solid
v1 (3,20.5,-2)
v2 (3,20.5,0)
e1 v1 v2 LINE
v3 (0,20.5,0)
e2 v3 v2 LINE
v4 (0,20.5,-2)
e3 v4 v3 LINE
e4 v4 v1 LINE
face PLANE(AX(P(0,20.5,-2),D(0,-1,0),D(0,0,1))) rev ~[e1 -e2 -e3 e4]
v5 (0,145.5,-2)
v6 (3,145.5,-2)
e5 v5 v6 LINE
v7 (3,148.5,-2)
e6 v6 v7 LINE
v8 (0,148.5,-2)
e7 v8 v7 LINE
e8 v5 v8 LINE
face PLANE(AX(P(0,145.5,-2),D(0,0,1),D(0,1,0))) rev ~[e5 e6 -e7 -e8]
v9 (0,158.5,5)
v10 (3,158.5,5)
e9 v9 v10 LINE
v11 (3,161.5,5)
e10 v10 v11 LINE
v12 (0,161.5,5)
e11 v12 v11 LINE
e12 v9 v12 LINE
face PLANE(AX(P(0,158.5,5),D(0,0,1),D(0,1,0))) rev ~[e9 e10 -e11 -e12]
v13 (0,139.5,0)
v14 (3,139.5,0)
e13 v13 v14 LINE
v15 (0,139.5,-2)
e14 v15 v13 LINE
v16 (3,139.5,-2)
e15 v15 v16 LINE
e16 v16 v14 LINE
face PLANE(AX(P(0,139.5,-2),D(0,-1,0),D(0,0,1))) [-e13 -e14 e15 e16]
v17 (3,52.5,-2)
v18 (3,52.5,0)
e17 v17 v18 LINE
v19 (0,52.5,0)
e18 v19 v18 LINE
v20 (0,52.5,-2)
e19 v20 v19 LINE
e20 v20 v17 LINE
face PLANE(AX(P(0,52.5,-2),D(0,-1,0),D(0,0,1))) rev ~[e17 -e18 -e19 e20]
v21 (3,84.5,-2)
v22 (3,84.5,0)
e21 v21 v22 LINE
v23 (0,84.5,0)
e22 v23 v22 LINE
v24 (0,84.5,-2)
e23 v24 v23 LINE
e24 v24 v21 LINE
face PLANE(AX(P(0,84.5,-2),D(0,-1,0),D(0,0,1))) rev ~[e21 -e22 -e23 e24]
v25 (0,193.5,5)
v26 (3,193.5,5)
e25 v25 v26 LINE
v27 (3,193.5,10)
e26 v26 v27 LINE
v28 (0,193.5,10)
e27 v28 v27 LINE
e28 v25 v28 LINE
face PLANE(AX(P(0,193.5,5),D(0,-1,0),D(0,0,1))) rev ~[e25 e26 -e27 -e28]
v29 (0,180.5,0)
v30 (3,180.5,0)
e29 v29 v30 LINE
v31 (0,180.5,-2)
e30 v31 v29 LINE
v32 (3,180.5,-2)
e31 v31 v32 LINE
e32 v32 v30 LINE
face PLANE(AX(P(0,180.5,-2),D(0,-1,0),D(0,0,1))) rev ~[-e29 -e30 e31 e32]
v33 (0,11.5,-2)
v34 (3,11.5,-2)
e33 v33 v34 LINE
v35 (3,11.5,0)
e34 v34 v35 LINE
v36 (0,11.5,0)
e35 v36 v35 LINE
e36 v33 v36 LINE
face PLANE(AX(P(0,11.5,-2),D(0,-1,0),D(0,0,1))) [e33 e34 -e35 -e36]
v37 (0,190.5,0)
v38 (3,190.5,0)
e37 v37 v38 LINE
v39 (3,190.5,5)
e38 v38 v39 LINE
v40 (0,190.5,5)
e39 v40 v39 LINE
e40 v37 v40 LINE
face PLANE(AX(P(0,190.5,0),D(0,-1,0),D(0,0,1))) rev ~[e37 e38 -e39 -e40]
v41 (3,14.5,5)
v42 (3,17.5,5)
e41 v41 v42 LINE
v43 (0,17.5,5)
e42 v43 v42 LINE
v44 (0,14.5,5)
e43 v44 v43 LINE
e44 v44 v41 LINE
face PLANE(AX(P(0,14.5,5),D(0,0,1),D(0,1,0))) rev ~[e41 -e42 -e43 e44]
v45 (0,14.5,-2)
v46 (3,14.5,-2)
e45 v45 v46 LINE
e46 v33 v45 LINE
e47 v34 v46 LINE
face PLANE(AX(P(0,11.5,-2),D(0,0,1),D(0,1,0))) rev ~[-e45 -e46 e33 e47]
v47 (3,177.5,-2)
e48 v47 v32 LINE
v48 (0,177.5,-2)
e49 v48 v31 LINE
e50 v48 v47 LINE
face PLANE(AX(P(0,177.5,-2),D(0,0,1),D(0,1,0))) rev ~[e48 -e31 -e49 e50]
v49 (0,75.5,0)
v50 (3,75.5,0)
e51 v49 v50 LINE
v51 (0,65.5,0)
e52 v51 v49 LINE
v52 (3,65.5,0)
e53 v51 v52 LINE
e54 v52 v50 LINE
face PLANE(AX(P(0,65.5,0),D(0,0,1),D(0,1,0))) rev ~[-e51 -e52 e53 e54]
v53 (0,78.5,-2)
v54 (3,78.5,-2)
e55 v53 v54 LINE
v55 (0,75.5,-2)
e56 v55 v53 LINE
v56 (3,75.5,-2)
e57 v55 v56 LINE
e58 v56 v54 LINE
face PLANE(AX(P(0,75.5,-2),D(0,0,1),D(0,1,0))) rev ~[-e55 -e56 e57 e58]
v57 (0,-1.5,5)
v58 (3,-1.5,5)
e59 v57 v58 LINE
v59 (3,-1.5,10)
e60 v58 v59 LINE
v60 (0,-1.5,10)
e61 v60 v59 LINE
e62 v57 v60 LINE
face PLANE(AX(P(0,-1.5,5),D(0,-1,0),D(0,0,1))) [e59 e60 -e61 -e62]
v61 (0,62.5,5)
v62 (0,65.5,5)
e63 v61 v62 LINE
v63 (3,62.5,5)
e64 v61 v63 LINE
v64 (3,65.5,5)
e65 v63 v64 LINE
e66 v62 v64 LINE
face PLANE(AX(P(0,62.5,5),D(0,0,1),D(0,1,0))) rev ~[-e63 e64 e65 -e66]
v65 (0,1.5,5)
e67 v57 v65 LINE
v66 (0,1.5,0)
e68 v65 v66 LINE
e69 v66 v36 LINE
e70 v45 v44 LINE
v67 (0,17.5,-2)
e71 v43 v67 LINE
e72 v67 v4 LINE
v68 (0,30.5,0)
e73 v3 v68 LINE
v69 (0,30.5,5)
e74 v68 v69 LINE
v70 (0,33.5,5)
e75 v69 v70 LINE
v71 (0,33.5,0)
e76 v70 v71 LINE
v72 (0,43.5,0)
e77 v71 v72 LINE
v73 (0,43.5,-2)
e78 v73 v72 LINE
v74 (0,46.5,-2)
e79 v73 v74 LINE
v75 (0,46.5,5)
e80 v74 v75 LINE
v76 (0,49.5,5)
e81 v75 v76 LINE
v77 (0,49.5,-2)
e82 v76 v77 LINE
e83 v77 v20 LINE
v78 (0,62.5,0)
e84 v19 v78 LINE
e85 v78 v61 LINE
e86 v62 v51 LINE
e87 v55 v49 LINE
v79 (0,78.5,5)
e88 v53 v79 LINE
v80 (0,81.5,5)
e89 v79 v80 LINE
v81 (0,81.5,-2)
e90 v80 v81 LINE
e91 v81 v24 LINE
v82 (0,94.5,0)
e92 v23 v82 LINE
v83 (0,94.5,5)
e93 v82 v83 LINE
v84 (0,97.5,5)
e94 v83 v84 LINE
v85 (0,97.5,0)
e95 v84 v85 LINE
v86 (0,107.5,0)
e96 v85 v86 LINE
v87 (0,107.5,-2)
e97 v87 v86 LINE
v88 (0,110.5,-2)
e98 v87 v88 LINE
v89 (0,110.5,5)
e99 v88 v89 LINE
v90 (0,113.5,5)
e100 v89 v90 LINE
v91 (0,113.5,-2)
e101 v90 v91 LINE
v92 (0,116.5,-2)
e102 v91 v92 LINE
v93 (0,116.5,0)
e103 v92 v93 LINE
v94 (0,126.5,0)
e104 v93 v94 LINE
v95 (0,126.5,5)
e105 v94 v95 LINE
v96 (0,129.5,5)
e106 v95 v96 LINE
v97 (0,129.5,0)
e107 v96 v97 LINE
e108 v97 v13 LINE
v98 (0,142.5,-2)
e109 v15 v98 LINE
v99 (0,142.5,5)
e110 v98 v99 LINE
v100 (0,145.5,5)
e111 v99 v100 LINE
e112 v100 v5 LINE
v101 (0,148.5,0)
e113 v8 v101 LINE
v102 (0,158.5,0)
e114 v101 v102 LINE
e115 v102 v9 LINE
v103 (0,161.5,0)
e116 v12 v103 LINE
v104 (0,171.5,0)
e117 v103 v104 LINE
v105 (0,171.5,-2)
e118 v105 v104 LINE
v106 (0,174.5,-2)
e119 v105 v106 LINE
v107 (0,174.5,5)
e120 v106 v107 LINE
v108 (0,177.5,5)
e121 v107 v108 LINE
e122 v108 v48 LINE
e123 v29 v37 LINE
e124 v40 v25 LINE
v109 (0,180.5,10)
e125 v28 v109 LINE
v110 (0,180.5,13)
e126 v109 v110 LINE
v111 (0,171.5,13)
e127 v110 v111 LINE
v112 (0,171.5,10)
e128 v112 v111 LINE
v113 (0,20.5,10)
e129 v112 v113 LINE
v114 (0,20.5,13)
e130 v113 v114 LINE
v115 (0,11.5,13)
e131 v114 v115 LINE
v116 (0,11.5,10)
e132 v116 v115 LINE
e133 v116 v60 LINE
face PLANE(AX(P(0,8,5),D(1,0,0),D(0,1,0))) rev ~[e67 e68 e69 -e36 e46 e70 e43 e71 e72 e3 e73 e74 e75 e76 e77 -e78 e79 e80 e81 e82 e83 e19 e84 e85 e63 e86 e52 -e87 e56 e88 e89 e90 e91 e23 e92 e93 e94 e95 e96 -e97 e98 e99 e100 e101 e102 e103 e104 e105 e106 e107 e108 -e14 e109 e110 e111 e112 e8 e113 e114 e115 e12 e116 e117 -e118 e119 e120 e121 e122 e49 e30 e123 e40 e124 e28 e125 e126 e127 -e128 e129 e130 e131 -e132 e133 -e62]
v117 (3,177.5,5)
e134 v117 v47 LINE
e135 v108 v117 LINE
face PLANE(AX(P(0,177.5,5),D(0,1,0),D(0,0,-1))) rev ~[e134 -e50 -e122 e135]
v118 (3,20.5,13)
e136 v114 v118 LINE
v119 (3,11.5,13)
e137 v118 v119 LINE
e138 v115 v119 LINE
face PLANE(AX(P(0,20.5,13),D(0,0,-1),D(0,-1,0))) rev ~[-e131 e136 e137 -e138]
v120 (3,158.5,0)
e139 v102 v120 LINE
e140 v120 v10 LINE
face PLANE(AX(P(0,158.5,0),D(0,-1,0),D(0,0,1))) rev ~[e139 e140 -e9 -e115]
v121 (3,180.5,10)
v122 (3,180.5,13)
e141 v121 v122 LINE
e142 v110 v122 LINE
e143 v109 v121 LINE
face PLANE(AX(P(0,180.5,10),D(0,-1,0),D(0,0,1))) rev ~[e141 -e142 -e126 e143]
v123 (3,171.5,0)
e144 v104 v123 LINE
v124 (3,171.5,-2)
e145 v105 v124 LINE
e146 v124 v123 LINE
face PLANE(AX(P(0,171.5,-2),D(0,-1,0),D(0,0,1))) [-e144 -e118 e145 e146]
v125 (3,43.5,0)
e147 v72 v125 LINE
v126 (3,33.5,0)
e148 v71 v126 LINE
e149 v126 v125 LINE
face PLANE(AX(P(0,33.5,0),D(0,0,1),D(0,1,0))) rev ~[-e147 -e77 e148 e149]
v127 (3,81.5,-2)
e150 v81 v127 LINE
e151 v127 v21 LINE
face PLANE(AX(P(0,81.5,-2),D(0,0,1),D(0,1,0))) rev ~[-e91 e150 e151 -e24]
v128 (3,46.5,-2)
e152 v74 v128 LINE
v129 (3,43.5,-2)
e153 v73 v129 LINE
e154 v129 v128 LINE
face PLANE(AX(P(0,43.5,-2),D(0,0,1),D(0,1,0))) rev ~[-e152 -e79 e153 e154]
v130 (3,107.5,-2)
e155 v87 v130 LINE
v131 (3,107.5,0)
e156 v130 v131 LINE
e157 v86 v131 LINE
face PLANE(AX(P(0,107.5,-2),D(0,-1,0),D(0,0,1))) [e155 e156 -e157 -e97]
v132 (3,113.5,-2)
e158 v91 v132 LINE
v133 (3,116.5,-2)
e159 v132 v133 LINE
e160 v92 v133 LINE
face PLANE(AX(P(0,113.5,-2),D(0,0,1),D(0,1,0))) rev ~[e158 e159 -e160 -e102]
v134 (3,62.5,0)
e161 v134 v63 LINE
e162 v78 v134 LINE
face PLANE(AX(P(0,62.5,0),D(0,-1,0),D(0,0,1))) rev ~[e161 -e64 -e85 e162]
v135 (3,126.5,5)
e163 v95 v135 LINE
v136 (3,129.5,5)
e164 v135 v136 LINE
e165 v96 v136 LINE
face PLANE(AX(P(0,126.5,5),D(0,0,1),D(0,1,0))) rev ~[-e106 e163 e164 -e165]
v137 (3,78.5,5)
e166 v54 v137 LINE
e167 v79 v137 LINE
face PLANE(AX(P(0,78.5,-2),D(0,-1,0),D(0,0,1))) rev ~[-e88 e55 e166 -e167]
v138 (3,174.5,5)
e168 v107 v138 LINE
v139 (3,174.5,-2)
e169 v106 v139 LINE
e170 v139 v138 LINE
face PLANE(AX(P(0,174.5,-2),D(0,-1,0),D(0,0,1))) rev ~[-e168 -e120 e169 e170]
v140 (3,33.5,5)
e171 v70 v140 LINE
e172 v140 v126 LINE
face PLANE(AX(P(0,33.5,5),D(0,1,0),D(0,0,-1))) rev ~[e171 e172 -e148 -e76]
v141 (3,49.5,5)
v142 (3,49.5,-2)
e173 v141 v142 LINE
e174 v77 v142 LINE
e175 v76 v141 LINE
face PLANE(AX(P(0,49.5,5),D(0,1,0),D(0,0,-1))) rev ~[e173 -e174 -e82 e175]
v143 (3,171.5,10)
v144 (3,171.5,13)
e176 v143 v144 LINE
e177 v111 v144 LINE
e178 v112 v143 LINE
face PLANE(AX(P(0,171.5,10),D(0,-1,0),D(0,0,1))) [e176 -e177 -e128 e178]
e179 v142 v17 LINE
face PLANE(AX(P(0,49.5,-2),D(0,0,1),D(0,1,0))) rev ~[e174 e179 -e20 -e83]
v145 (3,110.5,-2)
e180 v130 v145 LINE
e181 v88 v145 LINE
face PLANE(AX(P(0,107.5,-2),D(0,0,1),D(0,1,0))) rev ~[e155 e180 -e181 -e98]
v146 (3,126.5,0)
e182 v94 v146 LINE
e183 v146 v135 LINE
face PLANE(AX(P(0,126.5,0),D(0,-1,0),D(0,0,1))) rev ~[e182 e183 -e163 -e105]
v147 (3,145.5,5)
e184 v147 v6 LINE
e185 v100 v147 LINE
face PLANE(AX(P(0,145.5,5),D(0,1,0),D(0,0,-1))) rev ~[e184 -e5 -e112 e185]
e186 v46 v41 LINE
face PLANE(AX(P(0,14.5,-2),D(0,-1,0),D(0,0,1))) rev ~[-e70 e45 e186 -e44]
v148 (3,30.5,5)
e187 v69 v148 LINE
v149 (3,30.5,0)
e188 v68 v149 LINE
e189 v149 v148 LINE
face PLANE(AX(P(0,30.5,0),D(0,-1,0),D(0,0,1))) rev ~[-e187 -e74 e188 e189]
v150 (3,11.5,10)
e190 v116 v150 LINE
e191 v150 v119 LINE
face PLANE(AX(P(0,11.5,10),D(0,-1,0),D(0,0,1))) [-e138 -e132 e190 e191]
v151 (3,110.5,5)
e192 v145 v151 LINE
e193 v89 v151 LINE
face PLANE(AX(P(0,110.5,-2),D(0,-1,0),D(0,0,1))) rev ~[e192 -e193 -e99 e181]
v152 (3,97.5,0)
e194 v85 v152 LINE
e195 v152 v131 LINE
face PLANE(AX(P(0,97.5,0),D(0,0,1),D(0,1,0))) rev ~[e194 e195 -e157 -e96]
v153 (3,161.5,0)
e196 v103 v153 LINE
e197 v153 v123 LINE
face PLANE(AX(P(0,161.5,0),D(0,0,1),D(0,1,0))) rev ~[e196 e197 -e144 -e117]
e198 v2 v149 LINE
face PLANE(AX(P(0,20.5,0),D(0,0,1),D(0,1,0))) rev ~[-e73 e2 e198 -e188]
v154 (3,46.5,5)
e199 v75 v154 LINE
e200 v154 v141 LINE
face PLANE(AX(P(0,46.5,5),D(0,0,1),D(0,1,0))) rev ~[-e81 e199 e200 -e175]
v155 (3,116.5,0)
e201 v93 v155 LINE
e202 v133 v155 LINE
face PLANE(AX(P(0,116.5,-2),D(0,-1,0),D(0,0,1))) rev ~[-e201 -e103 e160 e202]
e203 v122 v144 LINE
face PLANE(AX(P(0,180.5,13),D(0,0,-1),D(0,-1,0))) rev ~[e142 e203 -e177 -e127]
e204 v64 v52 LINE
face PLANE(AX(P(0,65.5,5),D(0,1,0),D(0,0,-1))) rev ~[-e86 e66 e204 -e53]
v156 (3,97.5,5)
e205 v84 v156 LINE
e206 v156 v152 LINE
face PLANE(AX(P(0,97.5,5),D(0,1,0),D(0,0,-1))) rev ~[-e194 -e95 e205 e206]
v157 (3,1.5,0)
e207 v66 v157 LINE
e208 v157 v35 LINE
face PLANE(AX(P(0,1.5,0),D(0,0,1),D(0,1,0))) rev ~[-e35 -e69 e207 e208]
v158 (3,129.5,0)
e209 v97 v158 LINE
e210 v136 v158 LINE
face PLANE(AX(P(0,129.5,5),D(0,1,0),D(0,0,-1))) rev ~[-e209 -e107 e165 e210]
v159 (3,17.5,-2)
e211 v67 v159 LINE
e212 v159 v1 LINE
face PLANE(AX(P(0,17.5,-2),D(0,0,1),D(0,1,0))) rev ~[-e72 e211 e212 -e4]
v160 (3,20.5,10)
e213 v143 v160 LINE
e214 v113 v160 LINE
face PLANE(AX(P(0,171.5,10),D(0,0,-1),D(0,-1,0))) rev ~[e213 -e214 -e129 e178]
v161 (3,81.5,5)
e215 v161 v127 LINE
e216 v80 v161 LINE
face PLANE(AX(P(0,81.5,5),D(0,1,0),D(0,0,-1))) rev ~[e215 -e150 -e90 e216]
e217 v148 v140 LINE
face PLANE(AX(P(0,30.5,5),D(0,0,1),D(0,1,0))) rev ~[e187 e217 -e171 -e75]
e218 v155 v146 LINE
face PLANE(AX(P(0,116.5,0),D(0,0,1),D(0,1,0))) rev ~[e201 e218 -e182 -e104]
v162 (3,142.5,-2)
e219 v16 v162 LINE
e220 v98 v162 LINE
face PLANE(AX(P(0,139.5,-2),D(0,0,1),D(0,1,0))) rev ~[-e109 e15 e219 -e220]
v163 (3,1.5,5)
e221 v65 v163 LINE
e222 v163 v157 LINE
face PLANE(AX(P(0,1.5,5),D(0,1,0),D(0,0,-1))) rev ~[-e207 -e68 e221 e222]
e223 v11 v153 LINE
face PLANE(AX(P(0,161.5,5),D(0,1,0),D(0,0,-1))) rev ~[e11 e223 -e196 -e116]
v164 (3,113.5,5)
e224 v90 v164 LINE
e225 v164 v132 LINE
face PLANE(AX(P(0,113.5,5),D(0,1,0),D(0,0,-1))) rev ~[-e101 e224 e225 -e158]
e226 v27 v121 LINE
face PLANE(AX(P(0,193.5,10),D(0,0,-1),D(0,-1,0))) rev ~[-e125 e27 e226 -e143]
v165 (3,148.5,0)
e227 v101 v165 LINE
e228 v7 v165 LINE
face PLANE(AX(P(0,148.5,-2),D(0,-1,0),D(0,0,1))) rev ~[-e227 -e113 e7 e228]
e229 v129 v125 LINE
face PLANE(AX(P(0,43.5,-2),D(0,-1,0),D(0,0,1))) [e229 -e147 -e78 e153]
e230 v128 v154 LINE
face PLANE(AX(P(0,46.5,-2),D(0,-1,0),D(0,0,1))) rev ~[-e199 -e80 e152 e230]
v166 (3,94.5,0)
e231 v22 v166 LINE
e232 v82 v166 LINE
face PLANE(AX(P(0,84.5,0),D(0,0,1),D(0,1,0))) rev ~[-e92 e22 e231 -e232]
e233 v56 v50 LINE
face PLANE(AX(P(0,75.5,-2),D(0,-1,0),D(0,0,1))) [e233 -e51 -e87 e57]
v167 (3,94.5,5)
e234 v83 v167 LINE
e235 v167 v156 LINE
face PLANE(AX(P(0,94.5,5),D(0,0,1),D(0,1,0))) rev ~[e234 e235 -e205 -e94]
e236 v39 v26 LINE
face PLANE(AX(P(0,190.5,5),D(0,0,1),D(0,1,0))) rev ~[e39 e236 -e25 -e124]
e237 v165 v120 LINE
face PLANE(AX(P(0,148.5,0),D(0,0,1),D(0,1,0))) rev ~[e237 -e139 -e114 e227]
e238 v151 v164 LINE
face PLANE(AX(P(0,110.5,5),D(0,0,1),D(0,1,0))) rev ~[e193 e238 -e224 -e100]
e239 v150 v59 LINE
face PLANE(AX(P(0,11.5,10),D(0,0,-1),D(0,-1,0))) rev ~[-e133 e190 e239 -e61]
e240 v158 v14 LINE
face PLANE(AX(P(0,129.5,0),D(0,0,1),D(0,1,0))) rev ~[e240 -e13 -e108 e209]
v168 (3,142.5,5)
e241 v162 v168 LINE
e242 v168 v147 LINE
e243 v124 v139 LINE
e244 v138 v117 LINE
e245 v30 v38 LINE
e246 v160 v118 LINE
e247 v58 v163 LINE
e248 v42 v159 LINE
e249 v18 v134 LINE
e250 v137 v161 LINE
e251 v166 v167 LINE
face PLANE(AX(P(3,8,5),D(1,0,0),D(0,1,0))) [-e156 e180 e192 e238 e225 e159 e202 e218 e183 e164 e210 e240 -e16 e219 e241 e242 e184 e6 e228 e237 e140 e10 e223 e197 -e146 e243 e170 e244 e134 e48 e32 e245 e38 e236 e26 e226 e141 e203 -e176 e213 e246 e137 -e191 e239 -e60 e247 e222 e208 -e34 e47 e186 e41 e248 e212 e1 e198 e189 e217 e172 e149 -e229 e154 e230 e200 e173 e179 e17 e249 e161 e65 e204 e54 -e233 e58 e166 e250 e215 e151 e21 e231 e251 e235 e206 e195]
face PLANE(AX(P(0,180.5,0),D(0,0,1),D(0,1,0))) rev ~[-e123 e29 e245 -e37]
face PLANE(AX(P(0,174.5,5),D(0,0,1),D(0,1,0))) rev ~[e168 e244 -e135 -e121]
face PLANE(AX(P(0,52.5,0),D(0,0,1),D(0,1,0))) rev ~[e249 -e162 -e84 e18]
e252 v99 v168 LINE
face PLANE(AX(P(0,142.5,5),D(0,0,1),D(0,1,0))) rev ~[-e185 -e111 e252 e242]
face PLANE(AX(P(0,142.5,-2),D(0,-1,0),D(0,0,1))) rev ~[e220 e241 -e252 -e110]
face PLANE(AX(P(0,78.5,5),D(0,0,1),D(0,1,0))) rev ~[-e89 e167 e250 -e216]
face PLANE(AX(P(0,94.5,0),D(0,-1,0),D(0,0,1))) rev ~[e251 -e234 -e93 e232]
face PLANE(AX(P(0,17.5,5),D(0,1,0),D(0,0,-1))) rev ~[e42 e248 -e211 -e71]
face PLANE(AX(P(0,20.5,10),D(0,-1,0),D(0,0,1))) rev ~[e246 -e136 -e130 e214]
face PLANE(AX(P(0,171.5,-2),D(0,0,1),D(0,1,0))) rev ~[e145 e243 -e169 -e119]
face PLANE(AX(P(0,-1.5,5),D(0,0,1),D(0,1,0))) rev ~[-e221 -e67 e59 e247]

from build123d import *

# Parameters (mm, degrees)
F0_W     = 1.5
F0_H     = 5
F0_W_2   = 3
F0_H_2   = 2
F0_H_3   = 3
F1_DEPTH = 3


# Not quite as in the source:
# - a feature names something its author has since deleted; it is built from what else it names


with BuildPart() as f1:
    # F0 (on Right) → F1 (new body)
    with BuildSketch(Plane.YZ):
        Polygon((1.5, 5), (1.5, 0), (11.5, 0), (14.5, 0), (14.5, 5), (14.5, 10), (11.5, 10), (1.5, 10), align=None)
        with Locations((-0.75, 7.5)):
            Rectangle(F0_W, F0_H)
        with Locations((0.75, 7.5)):
            Rectangle(F0_W, F0_H)
        with Locations((13, -1)):
            Rectangle(F0_W_2, F0_H_2)
        with Locations((16, 7.5)):
            Rectangle(F0_W_2, F0_H)
        with Locations((19, -1)):
            Rectangle(F0_W_2, F0_H_2)
        Polygon((17.5, 5), (17.5, 0), (20.5, 0), (30.5, 0), (30.5, 5), (30.5, 10), (20.5, 10), (17.5, 10), align=None)
        with Locations((13, 11.5)):
            Rectangle(F0_W_2, F0_H_3)
        with Locations((16, 11.5)):
            Rectangle(F0_W_2, F0_H_3)
        with Locations((19, 11.5)):
            Rectangle(F0_W_2, F0_H_3)
        Polygon((33.5, 5), (33.5, 0), (43.5, 0), (46.5, 0), (46.5, 5), (46.5, 10), (33.5, 10), align=None)
        with Locations((32, 7.5)):
            Rectangle(F0_W_2, F0_H)
        with Locations((45, -1)):
            Rectangle(F0_W_2, F0_H_2)
        with Locations((48, 7.5)):
            Rectangle(F0_W_2, F0_H)
        with Locations((51, -1)):
            Rectangle(F0_W_2, F0_H_2)
        Polygon((49.5, 5), (49.5, 0), (52.5, 0), (62.5, 0), (62.5, 5), (62.5, 10), (49.5, 10), align=None)
        with Locations((64, 7.5)):
            Rectangle(F0_W_2, F0_H)
        Polygon((78.5, 10), (65.5, 10), (65.5, 5), (65.5, 0), (75.5, 0), (78.5, 0), (78.5, 5), align=None)
        with Locations((80, 7.5)):
            Rectangle(F0_W_2, F0_H)
        with Locations((77, -1)):
            Rectangle(F0_W_2, F0_H_2)
        Polygon((94.5, 10), (81.5, 10), (81.5, 5), (81.5, 0), (84.5, 0), (94.5, 0), (94.5, 5), align=None)
        with Locations((95.25, 7.5)):
            Rectangle(F0_W, F0_H)
        with Locations((83, -1)):
            Rectangle(F0_W_2, F0_H_2)
        with Locations((96.75, 7.5)):
            Rectangle(F0_W, F0_H)
        Polygon((110.5, 10), (97.5, 10), (97.5, 5), (97.5, 0), (107.5, 0), (110.5, 0), (110.5, 5), align=None)
        with Locations((112, 7.5)):
            Rectangle(F0_W_2, F0_H)
        Polygon((126.5, 10), (113.5, 10), (113.5, 5), (113.5, 0), (116.5, 0), (126.5, 0), (126.5, 5), align=None)
        with Locations((109, -1)):
            Rectangle(F0_W_2, F0_H_2)
        with Locations((128, 7.5)):
            Rectangle(F0_W_2, F0_H)
        with Locations((115, -1)):
            Rectangle(F0_W_2, F0_H_2)
        Polygon((142.5, 10), (129.5, 10), (129.5, 5), (129.5, 0), (139.5, 0), (142.5, 0), (142.5, 5), align=None)
        with Locations((144, 7.5)):
            Rectangle(F0_W_2, F0_H)
        Polygon((158.5, 10), (145.5, 10), (145.5, 5), (145.5, 0), (148.5, 0), (158.5, 0), (158.5, 5), align=None)
        with Locations((160, 7.5)):
            Rectangle(F0_W_2, F0_H)
        with Locations((141, -1)):
            Rectangle(F0_W_2, F0_H_2)
        with Locations((147, -1)):
            Rectangle(F0_W_2, F0_H_2)
        Polygon((171.5, 10), (161.5, 10), (161.5, 5), (161.5, 0), (171.5, 0), (174.5, 0), (174.5, 5), (174.5, 10), align=None)
        with Locations((173, 11.5)):
            Rectangle(F0_W_2, F0_H_3)
        with Locations((176, 11.5)):
            Rectangle(F0_W_2, F0_H_3)
        with Locations((176, 7.5)):
            Rectangle(F0_W_2, F0_H)
        with Locations((173, -1)):
            Rectangle(F0_W_2, F0_H_2)
        Polygon((180.5, 10), (177.5, 10), (177.5, 5), (177.5, 0), (180.5, 0), (190.5, 0), (190.5, 5), (190.5, 10), align=None)
        with Locations((179, 11.5)):
            Rectangle(F0_W_2, F0_H_3)
        with Locations((179, -1)):
            Rectangle(F0_W_2, F0_H_2)
        with Locations((191.25, 7.5)):
            Rectangle(F0_W, F0_H)
        with Locations((192.75, 7.5)):
            Rectangle(F0_W, F0_H)
    extrude(amount=F1_DEPTH)


solid = f1.part
